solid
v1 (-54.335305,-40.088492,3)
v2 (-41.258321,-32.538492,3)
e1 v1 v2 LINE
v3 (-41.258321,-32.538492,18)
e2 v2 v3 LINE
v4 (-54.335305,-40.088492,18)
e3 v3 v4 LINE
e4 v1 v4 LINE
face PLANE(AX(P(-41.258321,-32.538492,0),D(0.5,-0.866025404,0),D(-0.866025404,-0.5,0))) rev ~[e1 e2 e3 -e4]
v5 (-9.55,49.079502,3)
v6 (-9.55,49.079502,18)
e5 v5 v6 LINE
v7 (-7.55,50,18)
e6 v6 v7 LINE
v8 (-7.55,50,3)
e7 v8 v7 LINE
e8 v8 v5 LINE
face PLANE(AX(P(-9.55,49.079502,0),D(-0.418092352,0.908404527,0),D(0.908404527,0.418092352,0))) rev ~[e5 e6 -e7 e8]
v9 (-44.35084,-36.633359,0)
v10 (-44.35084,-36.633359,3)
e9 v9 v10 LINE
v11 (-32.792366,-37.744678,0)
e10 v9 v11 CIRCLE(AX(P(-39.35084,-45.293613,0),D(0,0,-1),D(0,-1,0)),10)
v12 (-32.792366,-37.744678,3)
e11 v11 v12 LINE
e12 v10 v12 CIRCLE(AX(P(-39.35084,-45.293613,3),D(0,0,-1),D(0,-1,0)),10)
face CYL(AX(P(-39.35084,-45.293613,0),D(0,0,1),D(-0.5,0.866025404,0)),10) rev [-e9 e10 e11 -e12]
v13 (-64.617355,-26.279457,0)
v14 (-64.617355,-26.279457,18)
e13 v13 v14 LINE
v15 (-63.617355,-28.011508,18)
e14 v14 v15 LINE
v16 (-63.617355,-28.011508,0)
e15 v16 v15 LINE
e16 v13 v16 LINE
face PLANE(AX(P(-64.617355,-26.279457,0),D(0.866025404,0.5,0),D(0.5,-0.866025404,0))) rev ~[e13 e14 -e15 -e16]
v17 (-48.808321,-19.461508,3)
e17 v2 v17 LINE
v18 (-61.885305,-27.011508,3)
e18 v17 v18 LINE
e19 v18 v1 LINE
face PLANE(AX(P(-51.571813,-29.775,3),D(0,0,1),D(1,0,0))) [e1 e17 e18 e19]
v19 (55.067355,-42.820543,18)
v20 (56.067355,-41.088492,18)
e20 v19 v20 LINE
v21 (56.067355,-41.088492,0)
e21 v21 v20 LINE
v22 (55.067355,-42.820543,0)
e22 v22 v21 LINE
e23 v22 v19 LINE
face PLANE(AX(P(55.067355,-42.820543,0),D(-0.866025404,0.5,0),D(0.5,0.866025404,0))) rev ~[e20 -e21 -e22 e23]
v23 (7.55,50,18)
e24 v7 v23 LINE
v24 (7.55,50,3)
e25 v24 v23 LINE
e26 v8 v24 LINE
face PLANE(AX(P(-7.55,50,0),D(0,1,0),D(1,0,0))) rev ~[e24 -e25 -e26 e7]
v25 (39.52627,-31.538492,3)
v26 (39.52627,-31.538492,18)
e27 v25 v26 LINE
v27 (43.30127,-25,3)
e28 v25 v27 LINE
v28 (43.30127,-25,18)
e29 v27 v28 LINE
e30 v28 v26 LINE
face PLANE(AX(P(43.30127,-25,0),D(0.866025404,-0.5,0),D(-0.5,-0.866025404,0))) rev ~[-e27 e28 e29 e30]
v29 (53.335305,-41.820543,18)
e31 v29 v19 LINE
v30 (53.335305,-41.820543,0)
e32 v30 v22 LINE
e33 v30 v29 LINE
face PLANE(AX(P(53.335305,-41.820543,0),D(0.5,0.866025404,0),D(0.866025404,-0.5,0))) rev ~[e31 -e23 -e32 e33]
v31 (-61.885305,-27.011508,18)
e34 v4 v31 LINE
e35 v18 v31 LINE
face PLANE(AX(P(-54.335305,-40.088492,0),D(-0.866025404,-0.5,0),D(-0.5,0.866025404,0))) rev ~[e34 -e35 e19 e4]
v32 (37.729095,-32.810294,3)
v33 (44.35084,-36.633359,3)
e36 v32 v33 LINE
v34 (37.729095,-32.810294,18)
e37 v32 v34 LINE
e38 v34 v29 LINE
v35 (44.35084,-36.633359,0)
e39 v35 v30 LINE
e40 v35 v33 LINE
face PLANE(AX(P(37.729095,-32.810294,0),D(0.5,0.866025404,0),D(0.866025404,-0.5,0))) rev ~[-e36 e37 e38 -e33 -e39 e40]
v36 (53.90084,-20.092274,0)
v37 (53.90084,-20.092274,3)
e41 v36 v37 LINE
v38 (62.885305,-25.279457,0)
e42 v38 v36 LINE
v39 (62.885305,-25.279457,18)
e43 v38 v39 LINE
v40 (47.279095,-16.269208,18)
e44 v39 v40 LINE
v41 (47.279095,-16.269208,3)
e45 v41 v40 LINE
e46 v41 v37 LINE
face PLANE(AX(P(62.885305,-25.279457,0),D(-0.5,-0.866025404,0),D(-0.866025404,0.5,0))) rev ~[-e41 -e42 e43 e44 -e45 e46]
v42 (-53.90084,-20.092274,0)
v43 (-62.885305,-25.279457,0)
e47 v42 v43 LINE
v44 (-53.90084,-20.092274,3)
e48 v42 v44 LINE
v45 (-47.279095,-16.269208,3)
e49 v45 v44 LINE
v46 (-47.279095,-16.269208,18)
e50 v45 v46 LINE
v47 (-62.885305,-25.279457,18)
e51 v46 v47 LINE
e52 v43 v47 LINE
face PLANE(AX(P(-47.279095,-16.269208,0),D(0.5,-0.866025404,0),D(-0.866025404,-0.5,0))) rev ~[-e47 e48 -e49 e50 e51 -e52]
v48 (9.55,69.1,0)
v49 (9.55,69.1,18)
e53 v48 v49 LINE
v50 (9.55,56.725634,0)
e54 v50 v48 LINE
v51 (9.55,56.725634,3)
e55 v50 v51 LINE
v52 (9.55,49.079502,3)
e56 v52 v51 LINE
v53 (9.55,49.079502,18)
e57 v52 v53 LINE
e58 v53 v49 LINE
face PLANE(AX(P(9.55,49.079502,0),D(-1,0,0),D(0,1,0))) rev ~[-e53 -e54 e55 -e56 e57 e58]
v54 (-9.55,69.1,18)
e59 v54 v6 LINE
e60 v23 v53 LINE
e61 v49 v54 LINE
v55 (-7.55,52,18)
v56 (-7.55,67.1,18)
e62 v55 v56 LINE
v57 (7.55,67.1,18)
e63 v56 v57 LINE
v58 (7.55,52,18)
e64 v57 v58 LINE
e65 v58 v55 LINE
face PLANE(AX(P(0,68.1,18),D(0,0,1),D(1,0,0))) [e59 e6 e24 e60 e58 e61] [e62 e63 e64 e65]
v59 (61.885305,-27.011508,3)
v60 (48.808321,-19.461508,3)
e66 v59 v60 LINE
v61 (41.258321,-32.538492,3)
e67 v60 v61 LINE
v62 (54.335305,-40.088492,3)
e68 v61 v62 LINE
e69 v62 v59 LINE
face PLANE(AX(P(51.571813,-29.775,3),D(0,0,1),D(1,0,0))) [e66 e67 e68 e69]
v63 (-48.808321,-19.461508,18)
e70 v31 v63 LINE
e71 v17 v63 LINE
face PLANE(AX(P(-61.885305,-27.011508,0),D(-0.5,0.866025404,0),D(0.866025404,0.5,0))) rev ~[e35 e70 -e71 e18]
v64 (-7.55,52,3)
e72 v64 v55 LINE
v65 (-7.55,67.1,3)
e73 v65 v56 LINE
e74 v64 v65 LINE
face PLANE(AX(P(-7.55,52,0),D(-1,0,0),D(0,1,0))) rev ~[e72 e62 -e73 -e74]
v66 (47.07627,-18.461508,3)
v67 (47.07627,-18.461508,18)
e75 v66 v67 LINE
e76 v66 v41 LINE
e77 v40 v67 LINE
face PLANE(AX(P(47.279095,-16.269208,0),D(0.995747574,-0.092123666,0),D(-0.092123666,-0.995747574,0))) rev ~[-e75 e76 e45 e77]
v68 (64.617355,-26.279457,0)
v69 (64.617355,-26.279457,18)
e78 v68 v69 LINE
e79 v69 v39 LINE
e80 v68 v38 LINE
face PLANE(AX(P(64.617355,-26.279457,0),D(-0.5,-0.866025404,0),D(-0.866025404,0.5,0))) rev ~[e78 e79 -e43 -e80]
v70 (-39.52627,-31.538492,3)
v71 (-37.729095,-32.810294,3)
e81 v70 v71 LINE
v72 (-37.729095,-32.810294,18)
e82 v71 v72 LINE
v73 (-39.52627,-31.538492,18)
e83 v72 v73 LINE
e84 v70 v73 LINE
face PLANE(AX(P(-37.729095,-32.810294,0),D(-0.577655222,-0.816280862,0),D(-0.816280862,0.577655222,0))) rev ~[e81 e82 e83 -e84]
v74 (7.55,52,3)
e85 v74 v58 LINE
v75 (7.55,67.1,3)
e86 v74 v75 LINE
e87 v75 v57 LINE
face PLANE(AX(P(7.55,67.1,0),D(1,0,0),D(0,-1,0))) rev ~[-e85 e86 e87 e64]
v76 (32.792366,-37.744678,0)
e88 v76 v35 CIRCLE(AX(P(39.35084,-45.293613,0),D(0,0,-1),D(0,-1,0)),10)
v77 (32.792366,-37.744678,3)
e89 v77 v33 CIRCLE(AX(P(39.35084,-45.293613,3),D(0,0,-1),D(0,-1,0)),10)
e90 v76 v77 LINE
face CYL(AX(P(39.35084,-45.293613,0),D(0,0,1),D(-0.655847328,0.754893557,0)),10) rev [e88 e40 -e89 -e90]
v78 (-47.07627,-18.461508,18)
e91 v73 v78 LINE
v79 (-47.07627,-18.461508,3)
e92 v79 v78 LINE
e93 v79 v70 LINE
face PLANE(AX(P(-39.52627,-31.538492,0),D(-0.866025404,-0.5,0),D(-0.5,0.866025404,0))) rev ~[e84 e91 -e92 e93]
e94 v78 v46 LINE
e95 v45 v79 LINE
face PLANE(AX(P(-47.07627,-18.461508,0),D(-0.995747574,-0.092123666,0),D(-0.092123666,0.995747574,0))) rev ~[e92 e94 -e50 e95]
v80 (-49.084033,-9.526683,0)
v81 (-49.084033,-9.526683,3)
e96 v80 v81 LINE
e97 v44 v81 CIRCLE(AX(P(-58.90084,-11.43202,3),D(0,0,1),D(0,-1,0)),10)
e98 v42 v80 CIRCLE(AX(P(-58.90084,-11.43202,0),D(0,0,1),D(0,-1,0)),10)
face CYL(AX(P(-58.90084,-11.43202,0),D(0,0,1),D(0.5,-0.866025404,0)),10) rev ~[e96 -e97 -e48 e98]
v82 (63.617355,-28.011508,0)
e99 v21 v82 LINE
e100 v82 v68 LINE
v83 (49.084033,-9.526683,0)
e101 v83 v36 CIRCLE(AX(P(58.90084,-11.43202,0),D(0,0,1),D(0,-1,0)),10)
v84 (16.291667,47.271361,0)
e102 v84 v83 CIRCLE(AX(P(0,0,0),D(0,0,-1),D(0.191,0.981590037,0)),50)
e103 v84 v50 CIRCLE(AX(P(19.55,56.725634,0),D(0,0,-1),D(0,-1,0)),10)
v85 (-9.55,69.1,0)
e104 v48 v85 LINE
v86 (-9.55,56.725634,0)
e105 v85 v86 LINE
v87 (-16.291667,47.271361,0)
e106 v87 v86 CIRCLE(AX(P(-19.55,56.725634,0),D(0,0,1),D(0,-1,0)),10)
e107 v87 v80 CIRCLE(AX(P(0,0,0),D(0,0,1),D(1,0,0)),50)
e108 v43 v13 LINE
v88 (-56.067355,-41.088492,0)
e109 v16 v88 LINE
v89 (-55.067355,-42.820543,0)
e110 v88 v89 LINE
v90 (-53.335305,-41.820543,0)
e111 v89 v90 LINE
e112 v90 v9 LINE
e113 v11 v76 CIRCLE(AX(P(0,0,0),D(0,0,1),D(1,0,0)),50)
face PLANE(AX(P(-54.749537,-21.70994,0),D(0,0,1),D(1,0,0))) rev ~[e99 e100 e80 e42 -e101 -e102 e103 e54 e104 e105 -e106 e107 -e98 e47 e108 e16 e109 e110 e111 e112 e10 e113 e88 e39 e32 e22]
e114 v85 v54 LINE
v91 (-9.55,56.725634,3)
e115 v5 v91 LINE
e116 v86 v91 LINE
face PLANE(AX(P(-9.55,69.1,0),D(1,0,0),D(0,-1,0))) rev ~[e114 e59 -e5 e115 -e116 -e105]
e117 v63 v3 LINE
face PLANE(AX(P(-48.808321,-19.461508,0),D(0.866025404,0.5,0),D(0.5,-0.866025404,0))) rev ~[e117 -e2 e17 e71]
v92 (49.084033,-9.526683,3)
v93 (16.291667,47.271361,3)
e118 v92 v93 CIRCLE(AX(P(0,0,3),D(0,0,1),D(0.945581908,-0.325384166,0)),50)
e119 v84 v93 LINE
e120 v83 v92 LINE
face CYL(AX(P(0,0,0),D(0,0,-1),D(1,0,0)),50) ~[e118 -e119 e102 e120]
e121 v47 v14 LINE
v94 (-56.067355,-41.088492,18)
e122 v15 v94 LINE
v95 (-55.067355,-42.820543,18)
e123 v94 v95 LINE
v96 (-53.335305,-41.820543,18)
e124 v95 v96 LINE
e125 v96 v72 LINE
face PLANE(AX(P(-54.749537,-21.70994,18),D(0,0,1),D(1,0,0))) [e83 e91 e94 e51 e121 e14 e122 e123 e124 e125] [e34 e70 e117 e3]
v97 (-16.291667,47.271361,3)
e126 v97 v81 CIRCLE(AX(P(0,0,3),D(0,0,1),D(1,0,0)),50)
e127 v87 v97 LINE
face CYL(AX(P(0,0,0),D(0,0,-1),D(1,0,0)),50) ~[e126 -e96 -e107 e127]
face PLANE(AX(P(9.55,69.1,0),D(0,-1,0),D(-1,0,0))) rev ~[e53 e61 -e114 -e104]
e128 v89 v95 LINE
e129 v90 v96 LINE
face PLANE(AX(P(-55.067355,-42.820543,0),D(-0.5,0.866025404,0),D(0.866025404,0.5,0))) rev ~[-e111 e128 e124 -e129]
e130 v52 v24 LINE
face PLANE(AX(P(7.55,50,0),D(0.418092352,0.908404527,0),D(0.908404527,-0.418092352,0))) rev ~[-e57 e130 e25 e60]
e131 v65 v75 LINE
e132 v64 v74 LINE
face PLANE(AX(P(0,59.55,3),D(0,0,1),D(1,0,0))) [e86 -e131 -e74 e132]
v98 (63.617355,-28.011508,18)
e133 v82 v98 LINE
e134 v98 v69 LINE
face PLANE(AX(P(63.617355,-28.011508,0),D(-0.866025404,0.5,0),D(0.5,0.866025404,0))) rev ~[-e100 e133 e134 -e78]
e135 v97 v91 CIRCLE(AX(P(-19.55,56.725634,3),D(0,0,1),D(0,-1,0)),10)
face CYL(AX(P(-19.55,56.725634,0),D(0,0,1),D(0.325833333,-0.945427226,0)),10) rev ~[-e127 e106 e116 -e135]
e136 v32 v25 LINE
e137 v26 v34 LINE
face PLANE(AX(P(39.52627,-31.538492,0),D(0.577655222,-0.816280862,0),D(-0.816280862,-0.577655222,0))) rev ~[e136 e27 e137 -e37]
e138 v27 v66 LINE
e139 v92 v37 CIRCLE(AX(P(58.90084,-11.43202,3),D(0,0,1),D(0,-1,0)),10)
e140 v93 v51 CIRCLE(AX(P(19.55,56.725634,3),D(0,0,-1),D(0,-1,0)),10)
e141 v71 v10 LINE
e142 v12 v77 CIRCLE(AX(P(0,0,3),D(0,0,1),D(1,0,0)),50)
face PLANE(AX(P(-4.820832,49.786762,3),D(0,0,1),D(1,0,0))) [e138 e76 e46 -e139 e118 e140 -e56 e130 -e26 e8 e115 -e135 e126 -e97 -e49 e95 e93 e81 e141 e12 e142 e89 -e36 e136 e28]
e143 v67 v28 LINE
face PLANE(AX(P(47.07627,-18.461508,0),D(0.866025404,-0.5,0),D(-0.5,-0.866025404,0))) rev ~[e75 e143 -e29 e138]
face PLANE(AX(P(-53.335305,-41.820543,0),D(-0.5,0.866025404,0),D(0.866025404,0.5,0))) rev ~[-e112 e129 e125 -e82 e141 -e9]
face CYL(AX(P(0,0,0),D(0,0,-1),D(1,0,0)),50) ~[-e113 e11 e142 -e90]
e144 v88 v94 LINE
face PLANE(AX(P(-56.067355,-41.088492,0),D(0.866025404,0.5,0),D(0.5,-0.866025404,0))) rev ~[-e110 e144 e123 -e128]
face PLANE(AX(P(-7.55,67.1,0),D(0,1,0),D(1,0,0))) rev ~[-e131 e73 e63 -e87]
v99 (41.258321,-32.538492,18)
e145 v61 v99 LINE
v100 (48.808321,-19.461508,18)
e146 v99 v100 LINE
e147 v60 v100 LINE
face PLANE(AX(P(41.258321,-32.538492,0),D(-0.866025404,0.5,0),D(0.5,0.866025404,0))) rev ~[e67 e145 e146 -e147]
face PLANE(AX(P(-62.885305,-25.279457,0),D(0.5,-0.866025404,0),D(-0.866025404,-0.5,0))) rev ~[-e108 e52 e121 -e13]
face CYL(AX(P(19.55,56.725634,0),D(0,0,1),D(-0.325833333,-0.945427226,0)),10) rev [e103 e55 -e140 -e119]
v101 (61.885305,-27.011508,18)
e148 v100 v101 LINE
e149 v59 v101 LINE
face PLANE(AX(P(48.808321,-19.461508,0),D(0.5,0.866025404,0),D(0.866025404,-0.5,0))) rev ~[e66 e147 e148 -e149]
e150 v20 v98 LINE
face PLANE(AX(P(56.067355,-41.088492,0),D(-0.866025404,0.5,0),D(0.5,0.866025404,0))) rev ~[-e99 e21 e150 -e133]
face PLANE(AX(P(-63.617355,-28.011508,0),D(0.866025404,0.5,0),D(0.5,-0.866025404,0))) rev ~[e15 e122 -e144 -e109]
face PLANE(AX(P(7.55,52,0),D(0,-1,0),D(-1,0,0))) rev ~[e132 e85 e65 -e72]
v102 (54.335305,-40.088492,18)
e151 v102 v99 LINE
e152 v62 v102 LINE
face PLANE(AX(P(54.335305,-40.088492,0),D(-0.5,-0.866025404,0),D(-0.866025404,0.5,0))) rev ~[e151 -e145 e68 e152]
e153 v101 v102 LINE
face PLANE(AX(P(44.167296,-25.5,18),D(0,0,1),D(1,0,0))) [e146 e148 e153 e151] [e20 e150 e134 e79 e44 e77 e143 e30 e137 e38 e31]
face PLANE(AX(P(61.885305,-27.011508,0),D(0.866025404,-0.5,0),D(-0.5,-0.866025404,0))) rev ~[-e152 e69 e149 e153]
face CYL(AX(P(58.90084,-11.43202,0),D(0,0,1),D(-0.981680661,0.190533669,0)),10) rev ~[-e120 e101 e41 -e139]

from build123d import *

# Parameters (mm, degrees)
F0_R     = 50
F1_DEPTH = 3
F2_W     = 15.1
F2_H     = 15.1
F3_DEPTH = 3
F2_H_2   = 2
F2_W_2   = 2
F4_DEPTH = 18
F5_R     = 10


with BuildPart() as f1:
    # F0 (on Top) → F1 (new body)
    with BuildSketch(Plane.XY):
        Circle(F0_R)
    extrude(amount=F1_DEPTH)

    # F2 (on Top) → F3, piece 3 (join)
    with BuildSketch(Plane.XY):
        with BuildLine():
            ThreePointArc((-9.55, 49.0795018312), (-4.7971297897, 49.7693434333), (0, 50))
            Line((0, 50), (-7.55, 50))
            Line((-7.55, 50), (-9.55, 49.0795018312))
        make_face()
        with BuildLine():
            ThreePointArc((0, 50), (4.7971297897, 49.7693434333), (9.55, 49.0795018312))
            Line((9.55, 49.0795018312), (7.55, 50))
            Line((7.55, 50), (0, 50))
        make_face()
        with BuildLine():
            Line((47.0762701892, -18.4615082014), (47.2790953909, -16.2692083095))
            ThreePointArc((47.2790953909, -16.2692083095), (45.5000807553, -20.7302351954), (43.3012704728, -24.9999995088))
            Line((43.3012704728, -24.9999995088), (47.0762701892, -18.4615082014))
        make_face()
        with BuildLine():
            Line((39.5262701892, -31.5384917986), (43.3012704728, -24.9999995088))
            ThreePointArc((43.3012704728, -24.9999995088), (40.7029510127, -29.039107749), (37.7290953909, -32.8102935217))
            Line((37.7290953909, -32.8102935217), (39.5262701892, -31.5384917986))
        make_face()
        with BuildLine():
            ThreePointArc((-43.3012707255, -24.9999990711), (-45.5000808601, -20.7302349654), (-47.2790953909, -16.2692083095))
            Line((-47.2790953909, -16.2692083095), (-47.0762701892, -18.4615082014))
            Line((-47.0762701892, -18.4615082014), (-43.3012707255, -24.9999990711))
        make_face()
        with BuildLine():
            Line((-39.5262701892, -31.5384917986), (-37.7290953909, -32.8102935217))
            ThreePointArc((-37.7290953909, -32.8102935217), (-40.7029511595, -29.0391075432), (-43.3012707255, -24.9999990711))
            Line((-43.3012707255, -24.9999990711), (-39.5262701892, -31.5384917986))
        make_face()
    extrude(amount=F3_DEPTH)



with BuildPart() as f3:
    # F2 (on Top) → F3 (new body)
    with BuildSketch(Plane.XY):
        with Locations((0, 59.55)):
            Rectangle(F2_W, F2_H)
    extrude(amount=F3_DEPTH)


with BuildPart() as f3b:
    # F2 (on Top) → F3, piece 2 (new body)
    with BuildSketch(Plane.XY):
        Polygon((54.3353045939, -40.0884917986), (61.8853045939, -27.0115082014), (48.8083209968, -19.4615082014), (41.2583209968, -32.5384917986), align=None)
    extrude(amount=F3_DEPTH)


with BuildPart() as f3c:
    # F2 (on Top) → F3, piece 4 (new body)
    with BuildSketch(Plane.XY):
        Polygon((-48.8083209968, -19.4615082014), (-61.8853045939, -27.0115082014), (-54.3353045939, -40.0884917986), (-41.2583209968, -32.5384917986), align=None)
    extrude(amount=F3_DEPTH)


with BuildPart() as f1_1:
    add(f1.part)

    add(f3.part)  # F4 merges F3

    add(f3b.part)  # F4 merges F3b

    add(f3c.part)  # F4 merges F3c
    # F2 (on Top) → F4 (join)
    with BuildSketch(Plane.XY):
        Polygon((-47.0762701892, -18.4615082014), (-47.2790953909, -16.2692083095), (-62.8853045939, -25.2794573939), (-61.8853045939, -27.0115082014), (-48.8083209968, -19.4615082014), align=None)
        Polygon((-39.5262701892, -31.5384917986), (-43.3012707255, -24.9999990711), (-47.0762701892, -18.4615082014), (-48.8083209968, -19.4615082014), (-41.2583209968, -32.5384917986), align=None)
        Polygon((-53.3353045939, -41.8205426061), (-37.7290953909, -32.8102935217), (-39.5262701892, -31.5384917986), (-41.2583209968, -32.5384917986), (-54.3353045939, -40.0884917986), align=None)
        Polygon((-54.3353045939, -40.0884917986), (-61.8853045939, -27.0115082014), (-63.6173554015, -28.0115082014), (-56.0673554015, -41.0884917986), align=None)
        Polygon((-61.8853045939, -27.0115082014), (-62.8853045939, -25.2794573939), (-64.6173554015, -26.2794573939), (-63.6173554015, -28.0115082014), align=None)
        Polygon((-55.0673554015, -42.8205426061), (-53.3353045939, -41.8205426061), (-54.3353045939, -40.0884917986), (-56.0673554015, -41.0884917986), align=None)
        Polygon((47.0762701892, -18.4615082014), (43.3012704728, -24.9999995088), (39.5262701892, -31.5384917986), (41.2583209968, -32.5384917986), (48.8083209968, -19.4615082014), align=None)
        Polygon((62.8853045939, -25.2794573939), (47.2790953909, -16.2692083095), (47.0762701892, -18.4615082014), (48.8083209968, -19.4615082014), (61.8853045939, -27.0115082014), align=None)
        Polygon((64.6173554015, -26.2794573939), (62.8853045939, -25.2794573939), (61.8853045939, -27.0115082014), (63.6173554015, -28.0115082014), align=None)
        Polygon((63.6173554015, -28.0115082014), (61.8853045939, -27.0115082014), (54.3353045939, -40.0884917986), (56.0673554015, -41.0884917986), align=None)
        Polygon((54.3353045939, -40.0884917986), (53.3353045939, -41.8205426061), (55.0673554015, -42.8205426061), (56.0673554015, -41.0884917986), align=None)
        Polygon((39.5262701892, -31.5384917986), (37.7290953909, -32.8102935217), (53.3353045939, -41.8205426061), (54.3353045939, -40.0884917986), (41.2583209968, -32.5384917986), align=None)
        with Locations((0, 68.1)):
            Rectangle(F2_W, F2_H_2)
        with Locations((-8.55, 68.1)):
            Rectangle(F2_W_2, F2_H_2)
        with Locations((8.55, 68.1)):
            Rectangle(F2_W_2, F2_H_2)
        Polygon((7.55, 50), (9.55, 49.0795018312), (9.55, 67.1), (7.55, 67.1), (7.55, 52), align=None)
        Polygon((-9.55, 67.1), (-9.55, 49.0795018312), (-7.55, 50), (-7.55, 52), (-7.55, 67.1), align=None)
        Polygon((-7.55, 50), (0, 50), (7.55, 50), (7.55, 52), (-7.55, 52), align=None)
    extrude(amount=F4_DEPTH)

    # F5
    f5_edges = [f1_1.edges().sort_by_distance(p)[0] for p in [
        (-9.55, 49.079502, 1.5),
        (9.55, 49.079502, 1.5),
        (-47.279095, -16.269208, 1.5),
        (-37.729095, -32.810294, 1.5),
        (37.729095, -32.810294, 1.5),
        (47.279095, -16.269208, 1.5),
    ]]
    fillet(f5_edges, radius=F5_R)


solid = f1_1.part
